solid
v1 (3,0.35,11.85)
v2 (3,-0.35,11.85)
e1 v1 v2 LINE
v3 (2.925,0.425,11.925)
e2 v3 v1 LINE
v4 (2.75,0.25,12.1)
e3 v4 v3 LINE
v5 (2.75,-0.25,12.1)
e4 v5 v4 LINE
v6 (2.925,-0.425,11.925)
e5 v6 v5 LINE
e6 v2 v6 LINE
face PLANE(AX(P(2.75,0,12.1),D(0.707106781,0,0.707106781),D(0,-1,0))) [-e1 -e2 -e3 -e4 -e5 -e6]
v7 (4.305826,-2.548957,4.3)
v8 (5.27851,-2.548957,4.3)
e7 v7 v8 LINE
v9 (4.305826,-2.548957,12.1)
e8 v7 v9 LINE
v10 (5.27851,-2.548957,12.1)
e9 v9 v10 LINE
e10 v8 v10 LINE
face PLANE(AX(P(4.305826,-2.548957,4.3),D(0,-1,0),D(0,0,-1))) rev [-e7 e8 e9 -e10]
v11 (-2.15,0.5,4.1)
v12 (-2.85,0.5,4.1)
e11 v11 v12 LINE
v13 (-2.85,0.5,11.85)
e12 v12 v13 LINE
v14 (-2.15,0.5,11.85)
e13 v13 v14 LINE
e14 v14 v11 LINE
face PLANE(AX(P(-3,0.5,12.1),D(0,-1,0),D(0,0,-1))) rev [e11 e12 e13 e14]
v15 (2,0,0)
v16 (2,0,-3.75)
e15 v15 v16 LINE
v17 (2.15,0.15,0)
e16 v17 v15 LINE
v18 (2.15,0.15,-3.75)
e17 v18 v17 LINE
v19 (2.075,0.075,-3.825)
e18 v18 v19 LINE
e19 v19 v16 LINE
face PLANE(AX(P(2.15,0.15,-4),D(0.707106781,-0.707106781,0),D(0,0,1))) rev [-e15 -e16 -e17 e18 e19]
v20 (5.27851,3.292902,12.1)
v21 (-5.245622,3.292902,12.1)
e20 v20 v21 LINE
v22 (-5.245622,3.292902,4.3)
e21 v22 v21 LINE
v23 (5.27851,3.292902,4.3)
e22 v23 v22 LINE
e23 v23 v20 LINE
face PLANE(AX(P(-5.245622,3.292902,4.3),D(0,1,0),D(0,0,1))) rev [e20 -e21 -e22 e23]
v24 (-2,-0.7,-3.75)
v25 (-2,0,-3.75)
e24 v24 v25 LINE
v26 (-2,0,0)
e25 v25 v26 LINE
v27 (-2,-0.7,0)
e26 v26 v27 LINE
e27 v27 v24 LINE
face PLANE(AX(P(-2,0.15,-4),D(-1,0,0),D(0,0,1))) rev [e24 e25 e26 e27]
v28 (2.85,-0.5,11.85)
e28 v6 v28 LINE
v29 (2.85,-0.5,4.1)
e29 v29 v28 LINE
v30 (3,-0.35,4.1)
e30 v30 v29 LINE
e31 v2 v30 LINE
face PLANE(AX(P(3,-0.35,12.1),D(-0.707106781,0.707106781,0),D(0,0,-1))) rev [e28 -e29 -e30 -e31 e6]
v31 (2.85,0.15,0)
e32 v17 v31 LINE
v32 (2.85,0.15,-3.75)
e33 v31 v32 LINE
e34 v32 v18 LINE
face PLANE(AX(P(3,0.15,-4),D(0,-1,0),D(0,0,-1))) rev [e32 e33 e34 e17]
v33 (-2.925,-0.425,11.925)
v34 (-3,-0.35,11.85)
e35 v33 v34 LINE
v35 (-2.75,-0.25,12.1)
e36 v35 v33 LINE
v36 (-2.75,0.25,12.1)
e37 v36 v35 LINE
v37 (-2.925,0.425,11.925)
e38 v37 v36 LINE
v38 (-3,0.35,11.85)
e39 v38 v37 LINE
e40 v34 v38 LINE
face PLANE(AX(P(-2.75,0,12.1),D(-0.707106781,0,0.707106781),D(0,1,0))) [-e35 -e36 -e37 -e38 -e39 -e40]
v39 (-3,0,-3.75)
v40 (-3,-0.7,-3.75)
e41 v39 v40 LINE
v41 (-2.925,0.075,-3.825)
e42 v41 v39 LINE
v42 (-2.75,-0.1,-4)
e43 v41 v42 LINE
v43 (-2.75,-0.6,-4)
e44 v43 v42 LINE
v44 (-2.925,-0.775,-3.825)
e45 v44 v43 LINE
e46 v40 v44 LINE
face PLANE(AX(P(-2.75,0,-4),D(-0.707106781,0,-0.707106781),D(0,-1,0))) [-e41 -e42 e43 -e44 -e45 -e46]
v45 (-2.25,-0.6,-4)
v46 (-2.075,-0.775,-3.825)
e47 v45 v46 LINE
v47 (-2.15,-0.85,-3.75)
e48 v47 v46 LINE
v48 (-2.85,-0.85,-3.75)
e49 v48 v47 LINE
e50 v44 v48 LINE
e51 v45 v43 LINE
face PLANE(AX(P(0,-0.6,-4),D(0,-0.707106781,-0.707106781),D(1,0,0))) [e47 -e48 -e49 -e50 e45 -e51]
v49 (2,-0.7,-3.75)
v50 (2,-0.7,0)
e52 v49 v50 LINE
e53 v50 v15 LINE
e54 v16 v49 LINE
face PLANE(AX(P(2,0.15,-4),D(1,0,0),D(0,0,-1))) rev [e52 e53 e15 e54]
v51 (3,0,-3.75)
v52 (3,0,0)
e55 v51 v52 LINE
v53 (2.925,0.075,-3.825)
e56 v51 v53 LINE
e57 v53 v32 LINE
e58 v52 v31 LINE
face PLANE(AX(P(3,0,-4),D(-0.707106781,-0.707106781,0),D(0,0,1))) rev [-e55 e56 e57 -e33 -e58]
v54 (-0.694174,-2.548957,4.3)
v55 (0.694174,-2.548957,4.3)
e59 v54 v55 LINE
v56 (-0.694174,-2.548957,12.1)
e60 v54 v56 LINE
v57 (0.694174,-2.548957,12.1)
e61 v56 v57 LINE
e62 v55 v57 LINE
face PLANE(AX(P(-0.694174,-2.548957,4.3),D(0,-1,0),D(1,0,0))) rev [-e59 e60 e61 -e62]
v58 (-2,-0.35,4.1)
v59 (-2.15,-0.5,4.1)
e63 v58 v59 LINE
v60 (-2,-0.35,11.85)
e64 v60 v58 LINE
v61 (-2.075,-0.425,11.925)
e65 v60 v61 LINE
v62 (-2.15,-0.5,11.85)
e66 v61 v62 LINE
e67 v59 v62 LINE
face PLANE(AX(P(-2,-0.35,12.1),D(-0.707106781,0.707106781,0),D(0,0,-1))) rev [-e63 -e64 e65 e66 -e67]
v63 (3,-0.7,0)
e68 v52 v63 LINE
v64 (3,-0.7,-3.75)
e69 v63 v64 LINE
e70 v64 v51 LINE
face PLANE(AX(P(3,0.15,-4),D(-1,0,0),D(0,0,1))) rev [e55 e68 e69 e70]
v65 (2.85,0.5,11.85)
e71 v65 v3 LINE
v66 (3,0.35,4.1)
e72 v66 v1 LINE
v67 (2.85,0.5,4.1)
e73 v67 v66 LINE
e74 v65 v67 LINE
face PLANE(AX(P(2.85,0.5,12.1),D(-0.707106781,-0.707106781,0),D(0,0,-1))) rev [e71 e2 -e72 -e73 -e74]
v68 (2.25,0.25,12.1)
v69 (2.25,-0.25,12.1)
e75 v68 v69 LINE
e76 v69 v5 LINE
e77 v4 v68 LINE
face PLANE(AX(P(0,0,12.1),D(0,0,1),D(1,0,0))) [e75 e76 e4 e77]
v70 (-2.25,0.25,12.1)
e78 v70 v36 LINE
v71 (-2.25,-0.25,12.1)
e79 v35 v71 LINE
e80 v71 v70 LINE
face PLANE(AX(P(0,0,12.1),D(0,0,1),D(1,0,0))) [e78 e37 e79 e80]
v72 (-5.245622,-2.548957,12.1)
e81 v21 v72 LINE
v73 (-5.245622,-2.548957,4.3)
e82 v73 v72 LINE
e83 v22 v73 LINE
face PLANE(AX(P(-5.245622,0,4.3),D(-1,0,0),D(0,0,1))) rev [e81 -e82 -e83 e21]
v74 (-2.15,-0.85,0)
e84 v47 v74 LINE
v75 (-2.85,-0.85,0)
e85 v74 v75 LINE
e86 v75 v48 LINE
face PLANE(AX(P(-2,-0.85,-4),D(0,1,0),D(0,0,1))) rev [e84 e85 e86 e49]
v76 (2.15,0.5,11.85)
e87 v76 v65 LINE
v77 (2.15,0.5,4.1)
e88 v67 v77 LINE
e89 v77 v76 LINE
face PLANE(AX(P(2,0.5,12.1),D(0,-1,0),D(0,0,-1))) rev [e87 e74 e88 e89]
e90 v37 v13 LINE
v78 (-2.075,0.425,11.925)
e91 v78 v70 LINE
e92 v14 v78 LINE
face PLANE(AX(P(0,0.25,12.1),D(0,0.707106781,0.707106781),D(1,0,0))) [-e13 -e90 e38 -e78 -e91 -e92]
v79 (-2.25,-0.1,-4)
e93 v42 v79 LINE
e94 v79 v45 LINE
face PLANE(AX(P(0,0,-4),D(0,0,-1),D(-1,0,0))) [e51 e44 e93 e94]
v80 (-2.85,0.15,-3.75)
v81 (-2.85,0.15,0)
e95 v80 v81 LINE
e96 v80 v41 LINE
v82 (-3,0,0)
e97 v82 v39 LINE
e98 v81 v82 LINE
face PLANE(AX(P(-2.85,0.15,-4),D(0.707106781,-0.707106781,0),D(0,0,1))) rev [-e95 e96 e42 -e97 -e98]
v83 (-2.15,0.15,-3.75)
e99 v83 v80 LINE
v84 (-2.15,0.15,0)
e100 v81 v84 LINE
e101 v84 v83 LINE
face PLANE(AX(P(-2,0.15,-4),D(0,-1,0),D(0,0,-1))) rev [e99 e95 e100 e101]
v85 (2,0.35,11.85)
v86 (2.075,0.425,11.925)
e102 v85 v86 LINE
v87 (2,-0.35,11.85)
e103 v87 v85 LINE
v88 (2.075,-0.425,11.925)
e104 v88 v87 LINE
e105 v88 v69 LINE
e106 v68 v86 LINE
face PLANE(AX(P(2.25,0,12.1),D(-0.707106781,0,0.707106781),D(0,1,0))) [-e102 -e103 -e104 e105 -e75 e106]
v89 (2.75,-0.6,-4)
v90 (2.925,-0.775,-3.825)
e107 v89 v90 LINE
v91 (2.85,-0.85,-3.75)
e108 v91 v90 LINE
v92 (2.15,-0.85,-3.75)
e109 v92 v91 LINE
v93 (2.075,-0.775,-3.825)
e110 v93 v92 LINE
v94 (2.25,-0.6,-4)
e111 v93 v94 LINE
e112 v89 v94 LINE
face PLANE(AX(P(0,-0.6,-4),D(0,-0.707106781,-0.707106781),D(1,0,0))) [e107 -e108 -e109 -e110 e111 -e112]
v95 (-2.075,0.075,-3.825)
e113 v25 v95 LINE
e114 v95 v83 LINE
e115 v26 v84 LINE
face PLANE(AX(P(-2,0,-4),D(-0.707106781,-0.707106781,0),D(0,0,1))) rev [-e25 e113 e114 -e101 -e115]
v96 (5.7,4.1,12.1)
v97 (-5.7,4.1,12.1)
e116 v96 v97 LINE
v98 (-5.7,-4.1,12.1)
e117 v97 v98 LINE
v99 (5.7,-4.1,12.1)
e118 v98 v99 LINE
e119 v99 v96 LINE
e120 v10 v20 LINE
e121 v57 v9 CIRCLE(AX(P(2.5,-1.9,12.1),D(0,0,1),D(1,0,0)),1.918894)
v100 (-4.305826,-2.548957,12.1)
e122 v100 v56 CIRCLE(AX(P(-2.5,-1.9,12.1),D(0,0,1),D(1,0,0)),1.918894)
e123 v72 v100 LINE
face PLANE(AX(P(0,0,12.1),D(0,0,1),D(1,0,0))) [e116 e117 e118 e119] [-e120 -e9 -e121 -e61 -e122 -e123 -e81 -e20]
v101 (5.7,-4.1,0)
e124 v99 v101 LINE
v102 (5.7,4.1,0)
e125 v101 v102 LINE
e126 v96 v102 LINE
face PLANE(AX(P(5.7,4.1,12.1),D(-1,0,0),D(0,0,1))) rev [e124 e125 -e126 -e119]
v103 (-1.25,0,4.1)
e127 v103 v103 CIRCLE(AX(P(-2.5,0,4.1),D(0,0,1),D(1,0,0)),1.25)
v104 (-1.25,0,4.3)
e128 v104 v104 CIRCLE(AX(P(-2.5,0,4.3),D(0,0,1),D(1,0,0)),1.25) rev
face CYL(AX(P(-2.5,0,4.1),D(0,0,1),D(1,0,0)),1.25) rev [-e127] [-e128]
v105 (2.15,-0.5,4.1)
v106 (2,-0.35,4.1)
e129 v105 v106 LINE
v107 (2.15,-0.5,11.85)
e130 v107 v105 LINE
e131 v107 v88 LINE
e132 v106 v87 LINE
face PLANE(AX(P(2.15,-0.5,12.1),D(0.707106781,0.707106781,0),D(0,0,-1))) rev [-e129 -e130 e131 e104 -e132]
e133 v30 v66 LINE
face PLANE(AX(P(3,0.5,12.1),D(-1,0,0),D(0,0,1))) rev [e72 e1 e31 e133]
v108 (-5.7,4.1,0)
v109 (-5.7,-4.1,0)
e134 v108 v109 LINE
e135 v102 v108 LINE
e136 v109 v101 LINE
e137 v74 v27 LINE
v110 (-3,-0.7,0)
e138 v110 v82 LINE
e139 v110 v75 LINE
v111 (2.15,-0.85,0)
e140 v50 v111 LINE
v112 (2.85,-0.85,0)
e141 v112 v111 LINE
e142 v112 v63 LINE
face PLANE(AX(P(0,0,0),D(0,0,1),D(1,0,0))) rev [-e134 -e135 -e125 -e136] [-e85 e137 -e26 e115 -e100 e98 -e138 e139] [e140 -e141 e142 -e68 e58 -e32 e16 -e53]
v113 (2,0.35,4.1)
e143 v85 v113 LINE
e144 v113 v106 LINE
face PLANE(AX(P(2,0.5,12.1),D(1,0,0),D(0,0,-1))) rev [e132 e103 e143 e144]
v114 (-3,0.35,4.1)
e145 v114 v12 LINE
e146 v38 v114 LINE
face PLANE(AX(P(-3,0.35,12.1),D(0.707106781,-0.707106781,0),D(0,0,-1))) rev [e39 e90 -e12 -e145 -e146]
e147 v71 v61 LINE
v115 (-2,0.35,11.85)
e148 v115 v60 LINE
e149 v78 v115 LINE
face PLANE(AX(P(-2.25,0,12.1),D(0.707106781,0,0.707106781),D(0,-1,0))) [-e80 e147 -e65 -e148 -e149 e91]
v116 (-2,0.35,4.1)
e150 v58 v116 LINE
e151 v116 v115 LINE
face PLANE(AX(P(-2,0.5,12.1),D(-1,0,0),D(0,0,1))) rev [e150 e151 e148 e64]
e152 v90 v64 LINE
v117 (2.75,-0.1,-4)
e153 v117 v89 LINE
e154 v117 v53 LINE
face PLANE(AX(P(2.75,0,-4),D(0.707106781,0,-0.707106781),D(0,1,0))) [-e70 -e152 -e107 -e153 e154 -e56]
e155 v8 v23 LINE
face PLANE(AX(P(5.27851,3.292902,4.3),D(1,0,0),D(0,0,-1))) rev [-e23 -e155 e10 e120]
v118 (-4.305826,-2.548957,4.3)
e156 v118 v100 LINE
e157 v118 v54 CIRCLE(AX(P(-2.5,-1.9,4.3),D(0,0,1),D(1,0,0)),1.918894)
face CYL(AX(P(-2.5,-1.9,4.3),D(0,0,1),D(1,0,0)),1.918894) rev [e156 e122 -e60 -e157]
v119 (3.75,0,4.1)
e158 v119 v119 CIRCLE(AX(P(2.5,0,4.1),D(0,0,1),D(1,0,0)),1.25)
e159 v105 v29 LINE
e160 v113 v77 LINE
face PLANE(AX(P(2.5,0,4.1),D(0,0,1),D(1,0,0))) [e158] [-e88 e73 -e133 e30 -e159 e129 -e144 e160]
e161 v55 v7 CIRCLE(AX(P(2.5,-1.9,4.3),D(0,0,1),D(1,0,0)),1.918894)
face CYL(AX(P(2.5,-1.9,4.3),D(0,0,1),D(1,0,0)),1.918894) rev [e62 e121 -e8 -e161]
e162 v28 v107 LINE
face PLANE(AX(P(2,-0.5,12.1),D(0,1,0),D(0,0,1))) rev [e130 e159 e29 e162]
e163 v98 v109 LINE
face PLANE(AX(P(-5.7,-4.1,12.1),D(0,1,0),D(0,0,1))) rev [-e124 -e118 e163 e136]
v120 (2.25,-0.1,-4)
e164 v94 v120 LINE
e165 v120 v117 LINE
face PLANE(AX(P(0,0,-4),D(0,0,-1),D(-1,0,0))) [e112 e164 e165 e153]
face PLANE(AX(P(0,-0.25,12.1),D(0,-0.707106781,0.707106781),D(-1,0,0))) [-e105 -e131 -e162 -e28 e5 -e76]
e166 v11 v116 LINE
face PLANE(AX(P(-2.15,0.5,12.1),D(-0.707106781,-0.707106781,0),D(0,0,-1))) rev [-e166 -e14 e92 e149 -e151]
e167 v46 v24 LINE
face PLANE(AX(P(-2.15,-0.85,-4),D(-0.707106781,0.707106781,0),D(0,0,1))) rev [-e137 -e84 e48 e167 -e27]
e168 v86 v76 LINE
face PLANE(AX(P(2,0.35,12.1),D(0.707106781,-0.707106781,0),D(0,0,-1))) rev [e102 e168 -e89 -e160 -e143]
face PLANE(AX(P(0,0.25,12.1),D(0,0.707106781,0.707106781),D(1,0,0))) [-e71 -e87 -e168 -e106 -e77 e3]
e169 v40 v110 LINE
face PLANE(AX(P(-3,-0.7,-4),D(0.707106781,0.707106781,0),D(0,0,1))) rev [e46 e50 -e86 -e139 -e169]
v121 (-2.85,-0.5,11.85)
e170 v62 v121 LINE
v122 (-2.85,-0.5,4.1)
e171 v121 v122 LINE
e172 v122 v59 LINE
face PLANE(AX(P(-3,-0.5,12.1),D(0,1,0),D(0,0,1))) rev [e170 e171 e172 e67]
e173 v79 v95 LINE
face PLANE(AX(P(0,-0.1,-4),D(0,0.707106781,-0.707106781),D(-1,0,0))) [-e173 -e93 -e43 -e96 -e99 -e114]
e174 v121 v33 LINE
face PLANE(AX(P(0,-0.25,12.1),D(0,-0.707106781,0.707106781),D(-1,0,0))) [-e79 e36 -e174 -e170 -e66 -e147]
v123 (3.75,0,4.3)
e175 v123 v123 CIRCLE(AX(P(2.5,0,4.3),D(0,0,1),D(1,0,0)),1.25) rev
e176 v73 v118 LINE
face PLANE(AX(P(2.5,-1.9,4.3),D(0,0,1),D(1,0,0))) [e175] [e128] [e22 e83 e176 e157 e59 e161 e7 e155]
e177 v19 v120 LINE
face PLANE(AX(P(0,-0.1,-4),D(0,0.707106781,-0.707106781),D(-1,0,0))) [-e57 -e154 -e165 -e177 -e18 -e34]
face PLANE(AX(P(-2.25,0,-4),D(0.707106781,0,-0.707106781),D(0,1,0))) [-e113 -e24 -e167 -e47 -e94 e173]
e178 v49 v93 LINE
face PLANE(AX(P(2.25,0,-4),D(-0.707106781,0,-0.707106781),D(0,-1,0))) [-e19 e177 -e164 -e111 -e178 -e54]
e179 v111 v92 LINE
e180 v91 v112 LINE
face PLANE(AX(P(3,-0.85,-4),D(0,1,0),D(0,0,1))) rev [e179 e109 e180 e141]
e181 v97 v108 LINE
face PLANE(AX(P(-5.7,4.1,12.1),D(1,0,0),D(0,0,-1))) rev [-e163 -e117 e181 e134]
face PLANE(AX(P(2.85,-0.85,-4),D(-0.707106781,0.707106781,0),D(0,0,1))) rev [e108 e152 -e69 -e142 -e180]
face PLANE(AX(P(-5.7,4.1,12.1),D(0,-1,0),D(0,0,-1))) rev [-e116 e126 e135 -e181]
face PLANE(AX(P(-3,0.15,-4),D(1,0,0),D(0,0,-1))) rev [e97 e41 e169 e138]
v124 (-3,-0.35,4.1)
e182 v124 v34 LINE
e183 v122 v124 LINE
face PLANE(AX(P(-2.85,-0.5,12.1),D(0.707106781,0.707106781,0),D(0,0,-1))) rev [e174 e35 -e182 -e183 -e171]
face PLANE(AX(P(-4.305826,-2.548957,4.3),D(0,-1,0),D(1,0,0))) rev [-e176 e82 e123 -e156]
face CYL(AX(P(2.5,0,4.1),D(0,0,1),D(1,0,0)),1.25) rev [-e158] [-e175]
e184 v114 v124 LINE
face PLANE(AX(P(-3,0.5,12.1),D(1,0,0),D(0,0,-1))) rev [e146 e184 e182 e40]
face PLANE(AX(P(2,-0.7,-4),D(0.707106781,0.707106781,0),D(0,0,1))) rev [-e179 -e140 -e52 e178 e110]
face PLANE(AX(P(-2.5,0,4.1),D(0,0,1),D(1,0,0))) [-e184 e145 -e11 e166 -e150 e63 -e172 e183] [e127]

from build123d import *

# Parameters (mm, degrees)
SKETCH_1_W          = 11.4
SKETCH_1_H          = 8.2
EXTRUDE_1_DEPTH     = 12.1
SKETCH_4_R          = 1.25
CUT_EXTRUDE_3_DEPTH = 8
CUT_EXTRUDE_4_DEPTH = 7.8
SKETCH_7_W          = 1
SKETCH_7_H          = 1
EXTRUDE_2_DEPTH     = 8
CHAMFER_1_SIZE      = 0.15
CHAMFER_2_SIZE      = 0.25
SKETCH_9_W          = 1
SKETCH_9_H          = 1
EXTRUDE_4_DEPTH     = 4
CHAMFER_5_SIZE      = 0.15
CHAMFER_6_SIZE      = 0.25


with BuildPart() as part:
    # Эскиз1 → Бобышка-Вытянуть1 (new body)
    with BuildSketch(Plane.XY):
        Rectangle(SKETCH_1_W, SKETCH_1_H)
    extrude(amount=EXTRUDE_1_DEPTH)

    # Эскиз4 → Вырез-Вытянуть3 (cut)
    with BuildSketch(Plane.XY.offset(12.1)):
        with Locations((-2.5, 0)):
            Circle(SKETCH_4_R)
        with Locations((2.5, 0)):
            Circle(SKETCH_4_R)
    extrude(amount=-CUT_EXTRUDE_3_DEPTH, mode=Mode.SUBTRACT)

    # Эскиз5 → Вырез-Вытянуть4 (cut)
    with BuildSketch(Plane.XY.offset(12.1)):
        with BuildLine():
            Line((-5.245621634, 0), (-5.245621634, 3.292901982))
            Line((-5.245621634, 3.292901982), (5.278509544, 3.292901982))
            Line((5.278509544, 3.292901982), (5.278509544, -2.548957219))
            Line((5.278509544, -2.548957219), (4.30582632, -2.548957219))
            ThreePointArc((4.30582632, -2.548957219), (2.5, -3.818893996), (0.69417368, -2.548957219))
            Line((0.69417368, -2.548957219), (-0.69417368, -2.548957219))
            ThreePointArc((-0.69417368, -2.548957219), (-2.5, -3.818893996), (-4.30582632, -2.548957219))
            Line((-4.30582632, -2.548957219), (-5.245621634, -2.548957219))
            Line((-5.245621634, -2.548957219), (-5.245621634, 0))
        make_face()
    extrude(amount=-CUT_EXTRUDE_4_DEPTH, mode=Mode.SUBTRACT)

    # Эскиз7 → Бобышка-Вытянуть2 (add)
    with BuildSketch(Plane.XY.offset(4.1)):
        with Locations((2.5, 0)):
            Rectangle(SKETCH_7_W, SKETCH_7_H)
        with Locations((-2.5, 0)):
            Rectangle(SKETCH_7_W, SKETCH_7_H)
    extrude(amount=EXTRUDE_2_DEPTH)

    # Фаска1
    chamfer_1_edges = [part.edges().sort_by_distance(p)[0] for p in [
        (-2, -0.5, 8.1),
        (-2, 0.5, 8.1),
        (-3, 0.5, 8.1),
        (-3, -0.5, 8.1),
        (3, -0.5, 8.1),
        (3, 0.5, 8.1),
        (2, 0.5, 8.1),
        (2, -0.5, 8.1),
    ]]
    chamfer(chamfer_1_edges, length=CHAMFER_1_SIZE)

    # Фаска2
    # the kernel refuses this chamfer: 0.25 mm, written as the material it takes off along each edge
    with BuildSketch(Plane(origin=(2, -0.992920747, 12.1), x_dir=(-0.027495876610586414, 0, -0.9996219169112968), z_dir=(0, 1, 0)), Plane(origin=(1.507079253, 0.5, 12.1), x_dir=(0, 0.027495876610586414, -0.9996219169112968), z_dir=(1, 0, 0)), Plane(origin=(3, 0.992920747, 12.1), x_dir=(0.02749587661058555, 0, -0.9996219169112968), z_dir=(0, -1, 0)), Plane(origin=(3.492920747, -0.5, 12.1), x_dir=(0, -0.027495876610586414, -0.9996219169112968), z_dir=(-1, 0, 0)), Plane(origin=(-2, 0.992920747, 12.1), x_dir=(0.027495876610586414, 0, -0.9996219169112968), z_dir=(0, -1, 0)), Plane(origin=(-1.507079253, -0.5, 12.1), x_dir=(0, -0.027495876610586414, -0.9996219169112968), z_dir=(-1, 0, 0)), Plane(origin=(-3, -0.992920747, 12.1), x_dir=(-0.02749587661058555, 0, -0.9996219169112968), z_dir=(0, 1, 0)), Plane(origin=(-3.492920747, 0.5, 12.1), x_dir=(0, 0.027495876610586414, -0.9996219169112968), z_dir=(1, 0, 0))) as chamfer_2_piece_1:
        Polygon((CHAMFER_2_SIZE * 0.999621916911, -CHAMFER_2_SIZE * 0.0274958766106), (-CHAMFER_2_SIZE * 0.0274958766106, -CHAMFER_2_SIZE * 0.999621916911), (0, 0), align=None)
    extrude(amount=1.985841494, mode=Mode.SUBTRACT)

    # Эскиз9 → Бобышка-Вытянуть4 (add)
    with BuildSketch(Plane(origin=(0, 0, 0), x_dir=(-1, 0, 0), z_dir=(0, 0, -1))):
        with Locations((2.5, -0.35)):
            Rectangle(SKETCH_9_W, SKETCH_9_H)
        with Locations((-2.5, -0.35)):
            Rectangle(SKETCH_9_W, SKETCH_9_H)
    extrude(amount=EXTRUDE_4_DEPTH)

    # Фаска5
    chamfer_5_edges = [part.edges().sort_by_distance(p)[0] for p in [
        (2, -0.85, -2),
        (2, 0.15, -2),
        (3, 0.15, -2),
        (3, -0.85, -2),
        (-3, -0.85, -2),
        (-3, 0.15, -2),
        (-2, 0.15, -2),
        (-2, -0.85, -2),
    ]]
    chamfer(chamfer_5_edges, length=CHAMFER_5_SIZE)

    # Фаска6
    # the kernel refuses this chamfer: 0.25 mm, written as the material it takes off along each edge
    with BuildSketch(Plane(origin=(-3.492920747, -0.85, -4), x_dir=(0, -0.02749587661058651, 0.9996219169112968), z_dir=(1, 0, 0)), Plane(origin=(1.507079253, -0.85, -4), x_dir=(0, -0.02749587661058651, 0.9996219169112968), z_dir=(1, 0, 0)), Plane(origin=(3, -1.342920747, -4), x_dir=(0.027495876610585647, 0, 0.9996219169112968), z_dir=(0, 1, 0)), Plane(origin=(2, 0.642920747, -4), x_dir=(-0.02749587661058651, 0, 0.9996219169112968), z_dir=(0, -1, 0)), Plane(origin=(-2, -1.342920747, -4), x_dir=(0.02749587661058651, 0, 0.9996219169112968), z_dir=(0, 1, 0)), Plane(origin=(-3, 0.642920747, -4), x_dir=(-0.027495876610585647, 0, 0.9996219169112968), z_dir=(0, -1, 0)), Plane(origin=(-1.507079253, 0.15, -4), x_dir=(0, 0.027495876610586403, 0.9996219169112968), z_dir=(-1, 0, 0)), Plane(origin=(3.492920747, 0.15, -4), x_dir=(0, 0.027495876610586403, 0.9996219169112968), z_dir=(-1, 0, 0))) as chamfer_6_piece_1:
        Polygon((CHAMFER_6_SIZE * 0.999621916911, -CHAMFER_6_SIZE * 0.0274958766106), (-CHAMFER_6_SIZE * 0.0274958766106, -CHAMFER_6_SIZE * 0.999621916911), (0, 0), align=None)
    extrude(amount=1.985841494, mode=Mode.SUBTRACT)


solid = part.part
